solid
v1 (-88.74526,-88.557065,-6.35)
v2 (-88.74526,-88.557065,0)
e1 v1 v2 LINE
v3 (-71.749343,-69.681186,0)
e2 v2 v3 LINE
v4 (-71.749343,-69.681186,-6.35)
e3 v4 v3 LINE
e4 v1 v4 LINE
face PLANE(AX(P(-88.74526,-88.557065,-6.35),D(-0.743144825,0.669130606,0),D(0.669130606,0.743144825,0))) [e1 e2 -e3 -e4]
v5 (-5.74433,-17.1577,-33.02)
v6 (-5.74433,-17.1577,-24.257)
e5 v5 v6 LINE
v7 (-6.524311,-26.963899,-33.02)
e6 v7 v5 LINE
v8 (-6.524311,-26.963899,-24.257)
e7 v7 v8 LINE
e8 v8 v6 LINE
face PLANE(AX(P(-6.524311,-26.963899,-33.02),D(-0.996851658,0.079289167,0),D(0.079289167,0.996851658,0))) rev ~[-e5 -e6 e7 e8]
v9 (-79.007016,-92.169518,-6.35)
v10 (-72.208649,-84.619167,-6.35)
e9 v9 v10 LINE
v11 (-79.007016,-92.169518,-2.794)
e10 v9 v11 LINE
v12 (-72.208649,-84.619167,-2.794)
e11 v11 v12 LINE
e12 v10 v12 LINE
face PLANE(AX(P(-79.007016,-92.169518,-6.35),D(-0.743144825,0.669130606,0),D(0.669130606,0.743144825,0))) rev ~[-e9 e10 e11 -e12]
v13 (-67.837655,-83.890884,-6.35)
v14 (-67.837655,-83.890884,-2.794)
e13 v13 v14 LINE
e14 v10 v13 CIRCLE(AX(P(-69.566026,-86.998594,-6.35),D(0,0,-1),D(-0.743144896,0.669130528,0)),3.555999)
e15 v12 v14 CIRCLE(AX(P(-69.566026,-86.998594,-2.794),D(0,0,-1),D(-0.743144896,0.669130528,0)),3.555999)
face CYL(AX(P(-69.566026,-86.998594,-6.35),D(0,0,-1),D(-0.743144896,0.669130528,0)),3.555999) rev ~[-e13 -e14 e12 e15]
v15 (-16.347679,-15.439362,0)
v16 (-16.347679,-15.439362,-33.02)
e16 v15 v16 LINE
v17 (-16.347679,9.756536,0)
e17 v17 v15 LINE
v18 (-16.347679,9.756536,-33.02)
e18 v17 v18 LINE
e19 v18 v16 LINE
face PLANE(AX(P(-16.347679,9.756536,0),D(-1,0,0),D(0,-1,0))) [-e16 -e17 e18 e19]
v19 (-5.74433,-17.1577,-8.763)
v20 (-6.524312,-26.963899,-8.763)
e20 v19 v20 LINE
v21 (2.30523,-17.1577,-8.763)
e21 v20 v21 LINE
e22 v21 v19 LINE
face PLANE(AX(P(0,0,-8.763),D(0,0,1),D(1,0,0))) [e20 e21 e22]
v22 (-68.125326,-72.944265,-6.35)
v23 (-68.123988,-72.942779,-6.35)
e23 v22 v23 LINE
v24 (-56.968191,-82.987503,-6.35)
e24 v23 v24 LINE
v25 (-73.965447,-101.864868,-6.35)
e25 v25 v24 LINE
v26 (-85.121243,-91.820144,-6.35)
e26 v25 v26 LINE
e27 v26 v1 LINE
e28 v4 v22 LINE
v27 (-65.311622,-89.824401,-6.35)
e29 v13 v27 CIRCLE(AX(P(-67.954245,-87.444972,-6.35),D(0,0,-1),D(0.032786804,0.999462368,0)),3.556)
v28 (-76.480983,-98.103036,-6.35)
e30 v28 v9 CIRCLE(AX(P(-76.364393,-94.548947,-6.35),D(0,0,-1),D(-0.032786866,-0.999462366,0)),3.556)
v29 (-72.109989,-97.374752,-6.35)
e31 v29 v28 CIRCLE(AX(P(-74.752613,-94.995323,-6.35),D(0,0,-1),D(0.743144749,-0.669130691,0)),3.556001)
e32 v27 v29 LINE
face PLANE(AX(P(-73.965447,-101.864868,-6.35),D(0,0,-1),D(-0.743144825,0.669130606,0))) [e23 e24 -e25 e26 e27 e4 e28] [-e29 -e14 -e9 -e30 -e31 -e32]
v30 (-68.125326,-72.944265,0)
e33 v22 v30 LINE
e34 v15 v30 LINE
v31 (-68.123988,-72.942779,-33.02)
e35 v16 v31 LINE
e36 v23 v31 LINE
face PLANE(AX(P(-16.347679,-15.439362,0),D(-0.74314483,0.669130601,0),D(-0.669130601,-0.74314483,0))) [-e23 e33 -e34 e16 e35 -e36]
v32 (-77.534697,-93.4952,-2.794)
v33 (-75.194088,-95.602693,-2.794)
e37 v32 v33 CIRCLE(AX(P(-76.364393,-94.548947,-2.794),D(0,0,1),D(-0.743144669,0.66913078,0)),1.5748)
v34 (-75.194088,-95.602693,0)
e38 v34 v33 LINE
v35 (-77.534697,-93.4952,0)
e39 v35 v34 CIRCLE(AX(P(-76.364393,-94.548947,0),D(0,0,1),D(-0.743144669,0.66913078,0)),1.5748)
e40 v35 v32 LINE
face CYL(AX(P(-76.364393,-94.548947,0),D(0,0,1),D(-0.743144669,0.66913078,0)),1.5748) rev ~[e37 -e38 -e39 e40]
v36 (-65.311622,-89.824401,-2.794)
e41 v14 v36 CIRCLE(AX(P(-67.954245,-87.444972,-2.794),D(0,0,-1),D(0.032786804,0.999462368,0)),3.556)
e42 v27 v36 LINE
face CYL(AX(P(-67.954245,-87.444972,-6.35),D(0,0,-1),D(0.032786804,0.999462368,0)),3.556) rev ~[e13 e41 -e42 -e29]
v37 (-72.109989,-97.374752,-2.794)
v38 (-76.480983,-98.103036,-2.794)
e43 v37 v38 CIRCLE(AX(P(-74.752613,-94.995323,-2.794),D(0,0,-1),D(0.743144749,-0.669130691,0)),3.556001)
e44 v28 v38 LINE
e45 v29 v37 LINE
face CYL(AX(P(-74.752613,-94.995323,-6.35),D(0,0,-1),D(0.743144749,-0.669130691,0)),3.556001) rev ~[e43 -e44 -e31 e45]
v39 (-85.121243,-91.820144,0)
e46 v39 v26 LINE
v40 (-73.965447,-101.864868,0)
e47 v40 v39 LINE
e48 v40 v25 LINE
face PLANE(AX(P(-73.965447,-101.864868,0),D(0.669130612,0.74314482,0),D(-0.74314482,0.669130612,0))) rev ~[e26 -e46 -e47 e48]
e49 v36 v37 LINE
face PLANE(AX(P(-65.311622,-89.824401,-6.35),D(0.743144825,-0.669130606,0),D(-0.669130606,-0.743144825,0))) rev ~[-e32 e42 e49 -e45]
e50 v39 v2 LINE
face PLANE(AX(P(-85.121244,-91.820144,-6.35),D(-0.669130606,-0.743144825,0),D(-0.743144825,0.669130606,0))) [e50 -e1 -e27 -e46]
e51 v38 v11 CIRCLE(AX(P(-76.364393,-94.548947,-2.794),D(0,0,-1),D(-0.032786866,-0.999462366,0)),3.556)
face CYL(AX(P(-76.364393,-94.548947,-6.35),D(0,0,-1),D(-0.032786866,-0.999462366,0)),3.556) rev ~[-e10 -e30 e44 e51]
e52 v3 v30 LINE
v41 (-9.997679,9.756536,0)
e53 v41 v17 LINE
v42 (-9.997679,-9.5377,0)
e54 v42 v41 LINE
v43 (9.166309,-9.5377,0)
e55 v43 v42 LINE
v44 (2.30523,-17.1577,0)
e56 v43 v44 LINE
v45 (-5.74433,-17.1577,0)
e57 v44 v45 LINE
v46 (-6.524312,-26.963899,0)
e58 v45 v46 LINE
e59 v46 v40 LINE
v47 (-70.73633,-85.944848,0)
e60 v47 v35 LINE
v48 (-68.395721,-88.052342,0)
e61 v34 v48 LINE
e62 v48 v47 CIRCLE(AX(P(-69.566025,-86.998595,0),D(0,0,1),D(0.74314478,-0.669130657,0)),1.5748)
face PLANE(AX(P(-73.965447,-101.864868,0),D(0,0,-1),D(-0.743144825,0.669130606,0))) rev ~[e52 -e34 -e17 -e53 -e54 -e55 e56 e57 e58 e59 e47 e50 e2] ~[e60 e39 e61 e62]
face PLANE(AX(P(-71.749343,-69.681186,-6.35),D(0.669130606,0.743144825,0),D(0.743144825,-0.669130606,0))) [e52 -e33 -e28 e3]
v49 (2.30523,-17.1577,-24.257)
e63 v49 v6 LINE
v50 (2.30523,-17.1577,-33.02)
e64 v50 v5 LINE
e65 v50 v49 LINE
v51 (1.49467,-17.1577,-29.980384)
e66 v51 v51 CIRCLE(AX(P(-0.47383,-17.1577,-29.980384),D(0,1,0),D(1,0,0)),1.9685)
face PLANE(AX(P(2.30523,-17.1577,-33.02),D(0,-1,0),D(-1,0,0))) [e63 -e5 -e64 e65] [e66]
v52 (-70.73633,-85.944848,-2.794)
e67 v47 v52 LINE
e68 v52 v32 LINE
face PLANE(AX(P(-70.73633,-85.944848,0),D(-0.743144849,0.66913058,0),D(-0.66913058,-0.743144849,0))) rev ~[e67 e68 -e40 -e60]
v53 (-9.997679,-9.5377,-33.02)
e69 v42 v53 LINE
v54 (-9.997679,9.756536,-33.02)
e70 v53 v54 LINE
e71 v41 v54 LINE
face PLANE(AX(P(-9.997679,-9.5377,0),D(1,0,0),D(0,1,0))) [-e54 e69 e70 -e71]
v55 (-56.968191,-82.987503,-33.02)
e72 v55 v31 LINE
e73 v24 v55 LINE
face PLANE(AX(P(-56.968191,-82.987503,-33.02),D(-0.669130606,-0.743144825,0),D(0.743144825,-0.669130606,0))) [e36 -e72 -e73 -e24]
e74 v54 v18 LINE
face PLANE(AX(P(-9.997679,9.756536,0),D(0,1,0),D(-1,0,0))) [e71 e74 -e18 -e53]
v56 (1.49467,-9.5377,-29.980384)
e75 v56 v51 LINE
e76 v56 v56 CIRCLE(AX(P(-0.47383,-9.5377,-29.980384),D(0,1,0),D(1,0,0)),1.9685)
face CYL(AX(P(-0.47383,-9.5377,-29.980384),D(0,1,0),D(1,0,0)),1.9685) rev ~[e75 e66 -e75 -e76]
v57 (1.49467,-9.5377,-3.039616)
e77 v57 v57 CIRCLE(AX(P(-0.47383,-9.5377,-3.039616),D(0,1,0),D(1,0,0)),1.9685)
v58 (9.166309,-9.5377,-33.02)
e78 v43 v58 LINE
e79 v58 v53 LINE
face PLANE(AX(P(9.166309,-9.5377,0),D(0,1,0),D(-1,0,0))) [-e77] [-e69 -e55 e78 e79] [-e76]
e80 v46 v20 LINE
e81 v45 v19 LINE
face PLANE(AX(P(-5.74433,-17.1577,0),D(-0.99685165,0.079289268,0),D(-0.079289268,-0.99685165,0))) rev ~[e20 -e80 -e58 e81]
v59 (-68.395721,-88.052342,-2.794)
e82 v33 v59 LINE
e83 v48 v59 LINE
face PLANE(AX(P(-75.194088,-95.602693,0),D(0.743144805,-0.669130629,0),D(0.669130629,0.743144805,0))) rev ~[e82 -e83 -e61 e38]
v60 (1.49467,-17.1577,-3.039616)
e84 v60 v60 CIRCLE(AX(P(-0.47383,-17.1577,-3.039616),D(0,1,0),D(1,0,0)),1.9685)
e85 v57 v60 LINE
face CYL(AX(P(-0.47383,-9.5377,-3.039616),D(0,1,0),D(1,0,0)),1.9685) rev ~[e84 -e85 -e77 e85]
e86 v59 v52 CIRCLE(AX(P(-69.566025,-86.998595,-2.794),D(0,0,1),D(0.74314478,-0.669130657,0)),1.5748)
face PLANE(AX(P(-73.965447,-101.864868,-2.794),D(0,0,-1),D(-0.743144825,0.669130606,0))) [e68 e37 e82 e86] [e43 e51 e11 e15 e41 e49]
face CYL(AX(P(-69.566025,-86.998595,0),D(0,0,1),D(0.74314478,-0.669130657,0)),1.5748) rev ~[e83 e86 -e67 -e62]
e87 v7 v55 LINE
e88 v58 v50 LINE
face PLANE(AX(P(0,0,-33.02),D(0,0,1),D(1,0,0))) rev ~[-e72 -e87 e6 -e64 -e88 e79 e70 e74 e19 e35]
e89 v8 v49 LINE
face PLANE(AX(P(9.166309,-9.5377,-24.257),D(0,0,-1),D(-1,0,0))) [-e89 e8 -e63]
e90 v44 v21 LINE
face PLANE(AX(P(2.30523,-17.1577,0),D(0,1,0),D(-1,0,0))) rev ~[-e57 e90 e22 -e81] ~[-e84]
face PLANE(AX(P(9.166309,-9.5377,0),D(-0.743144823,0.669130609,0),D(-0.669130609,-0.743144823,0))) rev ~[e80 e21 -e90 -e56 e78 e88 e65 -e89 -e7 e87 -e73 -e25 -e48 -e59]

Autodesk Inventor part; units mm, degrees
ref_plane "YZ Plane" through (0, 0, 0) normal (1, 0, 0) x (0, 1, 0)
ref_plane "XZ Plane" through (0, 0, 0) normal (0, 1, 0) x (-1, 0, 0)
ref_plane "Work Plane1" through (0, 0, 0) normal (0, 0, 1) x (1, 0, 0)
sketch "Sketch1" plane through (0, 0, 0) normal (0, 0, 1) x (1, 0, 0)
  line L0 (4.129202, -9.5377) -> (6.406797, -9.5377) construction
  line L1 (9.525, -8.41296) -> (9.525, -7.435497) construction
  line L2 (-6.406797, 9.5123) -> (-4.129202, 9.5123) construction
  line L3 (-9.525, 4.116502) -> (-9.525, 6.394097) construction
  line L4 (9.314549, -9.373063) -> (-73.965447, -101.864868) construction
  line L5 (9.166309, -9.5377) -> (-73.965447, -101.864868)
  line L6 (-73.965447, -101.864868) -> (-85.121243, -91.820144)
  line L7 (6.33881, 9.756536) -> (-85.121243, -91.820144) construction
  line L8 (9.166309, -9.5377) -> (-9.997679, -9.5377)
  line L9 (-9.997679, -9.5377) -> (-9.997679, 9.756536)
  line L10 (-9.997679, 9.756536) -> (-16.347679, 9.756536)
  line L11 (-16.347679, 9.756536) -> (-16.347679, -15.439362)
  line L12 (-16.347679, -15.439362) -> (-85.121243, -91.820144)
  point P0 (0, 0)
  dimension "d0" = 124.46
  dimension "d1" = 48
  dimension "d5" = 6.35
ref_plane "Work Plane2" through (-4.445, -9.144, -33.02) normal (0, 0, -1) x (0, 1, 0)
extrude "Extrusion1" add sketch "Sketch1" against normal up to surface (33.02 mm away)
sketch "Sketch2" plane through (-73.965447, -101.864868, -33.02) normal (-0.6691306, -0.7431448, 0) x (0.7431448, -0.6691306, 0)
  line L0 (0, 33.02) -> (0, 0)
  line L1 (-15.011605, 33.02) -> (-15.011605, 0)
  line L2 (0, 0) -> (-15.011605, 0)
  line L3 (-15.011605, 0) -> (-15.011605, 26.67)
  line L4 (-15.011605, 26.67) -> (0, 26.67)
  line L5 (0, 26.67) -> (0, 0)
  line L6 (-15.011605, 33.02) -> (0, 33.02)
  point P0 (-13.193862, 33.02)
  dimension "d19" = 6.35
extrude "Extrusion2" cut sketch "Sketch2" against normal blind 25.4 contours L0 L2 L1 L4
sketch "Sketch3" plane through (-73.965447, -101.864868, -6.35) normal (0, 0, -1) x (-0.7431448, 0.6691306, 0)
  line L0 (19.8882, 12.0904) -> (19.8882, 3.175) construction
  line L1 (0, 25.4) -> (15.011605, 25.4) construction
  line L2 (15.011605, 0) -> (0, 0) construction
  line L3 (0, 0) -> (19.8882, 0) construction
  line L4 (19.8882, 0) -> (19.8882, 25.4) construction
  line L5 (19.8882, 25.4) -> (0, 25.4) construction
  line L6 (0, 25.4) -> (0, 0) construction
  line L7 (15.011605, 0) -> (19.8882, 0)
  line L8 (19.8882, 0) -> (19.8882, 25.4)
  line L9 (19.8882, 25.4) -> (15.011605, 25.4)
  line L10 (15.011605, 25.4) -> (15.011605, 0)
  point P0 (13.193862, 125.192894)
extrude "Extrusion3" add sketch "Sketch3" against normal up to surface (6.35 mm away)
sketch "Sketch4" plane through (0, 0, 0) normal (0, 0, 1) x (1, 0, 0)
  circle A0 centre (-72.965209, -90.773771) radius 1.1938 construction
  circle A1 centre (-65.459407, -96.637946) radius 1.1938 construction
  line L0 (-72.965209, -90.773771) -> (-64.699827, -81.594134) construction
  line L1 (-88.74526, -88.557064) -> (-71.749342, -69.681186) construction
  line L2 (-72.965209, -90.773771) -> (-77.668593, -95.997407) construction
  line L3 (-76.364393, -94.548947) -> (-69.566026, -86.998595) construction
  line L4 (-75.194088, -95.602693) -> (-68.395721, -88.052342)
  line L5 (-70.73633, -85.944848) -> (-77.534697, -93.4952)
  arc A2 (-77.534697, -93.4952) -> (-75.194088, -95.602693) centre (-76.364393, -94.548947) ccw
  arc A3 (-68.395721, -88.052342) -> (-70.73633, -85.944848) centre (-69.566026, -86.998595) ccw
  line L6 (-65.459407, -96.637946) -> (-57.773123, -88.101463) construction
  line L7 (-73.965447, -101.864868) -> (9.166309, -9.5377) construction
  line L8 (-65.459407, -96.637946) -> (-69.368096, -100.978985) construction
  line L9 (-68.85859, -100.413122) -> (-62.060223, -92.862771) construction
  line L10 (-67.688286, -101.466869) -> (-60.889919, -93.916518)
  line L11 (-63.230528, -91.809024) -> (-70.028895, -99.359375)
  arc A4 (-70.028895, -99.359375) -> (-67.688286, -101.466869) centre (-68.85859, -100.413122) ccw
  arc A5 (-60.889919, -93.916518) -> (-63.230528, -91.809024) centre (-62.060223, -92.862771) ccw
  point P0 (0, 0)
  dimension "d13" = 5.08
  dimension "d14" = 3.1496
  dimension "d15" = 5.08
  dimension "d16" = 3.1496
extrude "Extrusion4" cut sketch "Sketch4" against normal through all
sketch "Sketch5" plane through (-73.965447, -101.864868, -6.35) normal (0, 0, -1) x (-0.7431448, 0.6691306, 0)
  arc A0 (6.7564, 14.73835) -> (3.6068, 14.73835) centre (5.1816, 14.73835) ccw
  arc A1 (3.6068, 4.57835) -> (6.7564, 4.57835) centre (5.1816, 4.57835) ccw
  line L0 (5.1816, 14.73835) -> (5.1816, 4.57835) construction
  line L1 (1.6256, 14.73835) -> (1.6256, 4.57835)
  line L2 (8.7376, 4.57835) -> (8.7376, 14.73835)
  arc A2 (8.7376, 14.73835) -> (1.6256, 14.73835) centre (5.1816, 14.73835) ccw
  arc A3 (1.6256, 4.57835) -> (8.7376, 4.57835) centre (5.1816, 4.57835) ccw
  arc A4 (8.252871, 13.991581) -> (5.103271, 13.991581) centre (6.678071, 13.991581) ccw
  arc A5 (5.103271, 3.831581) -> (8.252871, 3.831581) centre (6.678071, 3.831581) ccw
  line L3 (6.678071, 13.991581) -> (6.678071, 3.831581) construction
  line L4 (3.122071, 13.991581) -> (3.122071, 3.831581)
  line L5 (10.234071, 3.831581) -> (10.234071, 13.991581)
  arc A6 (10.234071, 13.991581) -> (3.122071, 13.991581) centre (6.678071, 13.991581) ccw
  arc A7 (3.122071, 3.831581) -> (10.234071, 3.831581) centre (6.678071, 3.831581) ccw
  point P0 (13.193862, 125.192894)
  point P1 (5.1816, 9.65835)
  point P2 (6.678071, 8.911581)
  dimension "d20" = 7.112
  dimension "d21" = 7.112
sketch "Sketch5 outline for Extrusion5" plane through (-73.965447, -101.864868, -6.35) normal (0, 0, -1) x (-0.7431448, 0.6691306, 0)
  line L0 (10.234071, 3.831581) -> (10.234071, 13.991581)
  arc A0 (10.234071, 13.991581) -> (7.473106, 17.457566) centre (6.678071, 13.991581) ccw
  arc A1 (7.473106, 17.457566) -> (1.6256, 14.73835) centre (5.1816, 14.73835) ccw
  line L1 (1.6256, 14.73835) -> (1.6256, 4.57835)
  arc A2 (1.6256, 4.57835) -> (4.386565, 1.112364) centre (5.1816, 4.57835) ccw
  arc A3 (4.386565, 1.112364) -> (10.234071, 3.831581) centre (6.678071, 3.831581) ccw
extrude "Extrusion5" cut sketch "Sketch5 outline for Extrusion5" against normal blind 3.556
sketch "Sketch6" plane through (-9.997679, -9.5377, 0) normal (0, 1, 0) x (1, 0, 0)
  arc A0 (9.506526, 4.79213) -> (10.740649, 4.300966) centre (9.523849, 3.039616) ccw construction
  arc A1 (9.506526, 31.732899) -> (10.740649, 31.241734) centre (9.523849, 29.980384) ccw construction
  circle A2 centre (9.523849, 29.980384) radius 1.9685
  circle A3 centre (9.523849, 3.039616) radius 1.9685
  point P0 (9.997679, 0)
  dimension "d24" = 3.937
  dimension "d25" = 3.937
extrude "Extrusion6" cut sketch "Sketch6" against normal through all
sketch "Sketch7" plane through (9.166309, -9.5377, 0) normal (0.7431448, -0.6691306, 0) x (0, 0, -1)
  line L0 (33.02, -98.838459) -> (33.02, 0) construction
  line L1 (33.02, -9.525) -> (0, -9.525) construction
  point P0 (0, 0.954435)
sketch "Sketch8" plane through (9.166309, -9.5377, -33.02) normal (0, 0, -1) x (-1, 0, 0)
  line L0 (11.608639, 0) -> (11.608639, -12.892699) construction
  line L1 (66.135838, -73.451289) -> (0, 0) construction
  line L2 (11.608639, -7.62) -> (6.861079, -7.62) construction
  line L3 (0, 0) -> (19.163987, 0) construction
  line L4 (7.671639, 0) -> (7.671639, -8.520218) construction
  line L5 (14.910639, 0) -> (14.910639, -14.251905) construction
  line L6 (6.861079, -7.62) -> (14.910639, -7.62)
  line L7 (83.131755, -92.327168) -> (0, 0)
  line L8 (15.69062, -17.426199) -> (6.861079, -7.62)
  line L9 (15.69062, -17.426199) -> (14.910639, -7.62)
  point P0 (9.166309, 9.5377)
  dimension "d28" = 7.62
  dimension "d29" = 3.302
extrude "Extrusion7" cut sketch "Sketch8" against normal blind 8.763
sketch "Sketch9" plane through (0, 0, 0) normal (0, 0, 1) x (1, 0, 0)
  line L0 (2.30523, -17.1577) -> (-5.74433, -17.1577) construction
  line L1 (-5.74433, -17.1577) -> (-6.524312, -26.963899) construction
  line L2 (2.30523, -17.1577) -> (-6.524312, -26.963899)
  line L3 (-73.965447, -101.864868) -> (9.166309, -9.5377)
  line L4 (2.30523, -17.1577) -> (-5.74433, -17.1577)
  line L5 (-5.2705, -26.963899) -> (-5.2705, -17.1577)
  point P0 (0, 0)
sketch "Sketch9 outline for Extrusion8" plane through (0, 0, 0) normal (0, 0, 1) x (1, 0, 0)
  line L0 (-6.524312, -26.963899) -> (2.30523, -17.1577)
  line L1 (-5.74433, -17.1577) -> (-6.524312, -26.963899)
  line L2 (2.30523, -17.1577) -> (-5.74433, -17.1577)
extrude "Extrusion8" cut sketch "Sketch9 outline for Extrusion8" against normal blind 8.763
properties part number "arm stop"
